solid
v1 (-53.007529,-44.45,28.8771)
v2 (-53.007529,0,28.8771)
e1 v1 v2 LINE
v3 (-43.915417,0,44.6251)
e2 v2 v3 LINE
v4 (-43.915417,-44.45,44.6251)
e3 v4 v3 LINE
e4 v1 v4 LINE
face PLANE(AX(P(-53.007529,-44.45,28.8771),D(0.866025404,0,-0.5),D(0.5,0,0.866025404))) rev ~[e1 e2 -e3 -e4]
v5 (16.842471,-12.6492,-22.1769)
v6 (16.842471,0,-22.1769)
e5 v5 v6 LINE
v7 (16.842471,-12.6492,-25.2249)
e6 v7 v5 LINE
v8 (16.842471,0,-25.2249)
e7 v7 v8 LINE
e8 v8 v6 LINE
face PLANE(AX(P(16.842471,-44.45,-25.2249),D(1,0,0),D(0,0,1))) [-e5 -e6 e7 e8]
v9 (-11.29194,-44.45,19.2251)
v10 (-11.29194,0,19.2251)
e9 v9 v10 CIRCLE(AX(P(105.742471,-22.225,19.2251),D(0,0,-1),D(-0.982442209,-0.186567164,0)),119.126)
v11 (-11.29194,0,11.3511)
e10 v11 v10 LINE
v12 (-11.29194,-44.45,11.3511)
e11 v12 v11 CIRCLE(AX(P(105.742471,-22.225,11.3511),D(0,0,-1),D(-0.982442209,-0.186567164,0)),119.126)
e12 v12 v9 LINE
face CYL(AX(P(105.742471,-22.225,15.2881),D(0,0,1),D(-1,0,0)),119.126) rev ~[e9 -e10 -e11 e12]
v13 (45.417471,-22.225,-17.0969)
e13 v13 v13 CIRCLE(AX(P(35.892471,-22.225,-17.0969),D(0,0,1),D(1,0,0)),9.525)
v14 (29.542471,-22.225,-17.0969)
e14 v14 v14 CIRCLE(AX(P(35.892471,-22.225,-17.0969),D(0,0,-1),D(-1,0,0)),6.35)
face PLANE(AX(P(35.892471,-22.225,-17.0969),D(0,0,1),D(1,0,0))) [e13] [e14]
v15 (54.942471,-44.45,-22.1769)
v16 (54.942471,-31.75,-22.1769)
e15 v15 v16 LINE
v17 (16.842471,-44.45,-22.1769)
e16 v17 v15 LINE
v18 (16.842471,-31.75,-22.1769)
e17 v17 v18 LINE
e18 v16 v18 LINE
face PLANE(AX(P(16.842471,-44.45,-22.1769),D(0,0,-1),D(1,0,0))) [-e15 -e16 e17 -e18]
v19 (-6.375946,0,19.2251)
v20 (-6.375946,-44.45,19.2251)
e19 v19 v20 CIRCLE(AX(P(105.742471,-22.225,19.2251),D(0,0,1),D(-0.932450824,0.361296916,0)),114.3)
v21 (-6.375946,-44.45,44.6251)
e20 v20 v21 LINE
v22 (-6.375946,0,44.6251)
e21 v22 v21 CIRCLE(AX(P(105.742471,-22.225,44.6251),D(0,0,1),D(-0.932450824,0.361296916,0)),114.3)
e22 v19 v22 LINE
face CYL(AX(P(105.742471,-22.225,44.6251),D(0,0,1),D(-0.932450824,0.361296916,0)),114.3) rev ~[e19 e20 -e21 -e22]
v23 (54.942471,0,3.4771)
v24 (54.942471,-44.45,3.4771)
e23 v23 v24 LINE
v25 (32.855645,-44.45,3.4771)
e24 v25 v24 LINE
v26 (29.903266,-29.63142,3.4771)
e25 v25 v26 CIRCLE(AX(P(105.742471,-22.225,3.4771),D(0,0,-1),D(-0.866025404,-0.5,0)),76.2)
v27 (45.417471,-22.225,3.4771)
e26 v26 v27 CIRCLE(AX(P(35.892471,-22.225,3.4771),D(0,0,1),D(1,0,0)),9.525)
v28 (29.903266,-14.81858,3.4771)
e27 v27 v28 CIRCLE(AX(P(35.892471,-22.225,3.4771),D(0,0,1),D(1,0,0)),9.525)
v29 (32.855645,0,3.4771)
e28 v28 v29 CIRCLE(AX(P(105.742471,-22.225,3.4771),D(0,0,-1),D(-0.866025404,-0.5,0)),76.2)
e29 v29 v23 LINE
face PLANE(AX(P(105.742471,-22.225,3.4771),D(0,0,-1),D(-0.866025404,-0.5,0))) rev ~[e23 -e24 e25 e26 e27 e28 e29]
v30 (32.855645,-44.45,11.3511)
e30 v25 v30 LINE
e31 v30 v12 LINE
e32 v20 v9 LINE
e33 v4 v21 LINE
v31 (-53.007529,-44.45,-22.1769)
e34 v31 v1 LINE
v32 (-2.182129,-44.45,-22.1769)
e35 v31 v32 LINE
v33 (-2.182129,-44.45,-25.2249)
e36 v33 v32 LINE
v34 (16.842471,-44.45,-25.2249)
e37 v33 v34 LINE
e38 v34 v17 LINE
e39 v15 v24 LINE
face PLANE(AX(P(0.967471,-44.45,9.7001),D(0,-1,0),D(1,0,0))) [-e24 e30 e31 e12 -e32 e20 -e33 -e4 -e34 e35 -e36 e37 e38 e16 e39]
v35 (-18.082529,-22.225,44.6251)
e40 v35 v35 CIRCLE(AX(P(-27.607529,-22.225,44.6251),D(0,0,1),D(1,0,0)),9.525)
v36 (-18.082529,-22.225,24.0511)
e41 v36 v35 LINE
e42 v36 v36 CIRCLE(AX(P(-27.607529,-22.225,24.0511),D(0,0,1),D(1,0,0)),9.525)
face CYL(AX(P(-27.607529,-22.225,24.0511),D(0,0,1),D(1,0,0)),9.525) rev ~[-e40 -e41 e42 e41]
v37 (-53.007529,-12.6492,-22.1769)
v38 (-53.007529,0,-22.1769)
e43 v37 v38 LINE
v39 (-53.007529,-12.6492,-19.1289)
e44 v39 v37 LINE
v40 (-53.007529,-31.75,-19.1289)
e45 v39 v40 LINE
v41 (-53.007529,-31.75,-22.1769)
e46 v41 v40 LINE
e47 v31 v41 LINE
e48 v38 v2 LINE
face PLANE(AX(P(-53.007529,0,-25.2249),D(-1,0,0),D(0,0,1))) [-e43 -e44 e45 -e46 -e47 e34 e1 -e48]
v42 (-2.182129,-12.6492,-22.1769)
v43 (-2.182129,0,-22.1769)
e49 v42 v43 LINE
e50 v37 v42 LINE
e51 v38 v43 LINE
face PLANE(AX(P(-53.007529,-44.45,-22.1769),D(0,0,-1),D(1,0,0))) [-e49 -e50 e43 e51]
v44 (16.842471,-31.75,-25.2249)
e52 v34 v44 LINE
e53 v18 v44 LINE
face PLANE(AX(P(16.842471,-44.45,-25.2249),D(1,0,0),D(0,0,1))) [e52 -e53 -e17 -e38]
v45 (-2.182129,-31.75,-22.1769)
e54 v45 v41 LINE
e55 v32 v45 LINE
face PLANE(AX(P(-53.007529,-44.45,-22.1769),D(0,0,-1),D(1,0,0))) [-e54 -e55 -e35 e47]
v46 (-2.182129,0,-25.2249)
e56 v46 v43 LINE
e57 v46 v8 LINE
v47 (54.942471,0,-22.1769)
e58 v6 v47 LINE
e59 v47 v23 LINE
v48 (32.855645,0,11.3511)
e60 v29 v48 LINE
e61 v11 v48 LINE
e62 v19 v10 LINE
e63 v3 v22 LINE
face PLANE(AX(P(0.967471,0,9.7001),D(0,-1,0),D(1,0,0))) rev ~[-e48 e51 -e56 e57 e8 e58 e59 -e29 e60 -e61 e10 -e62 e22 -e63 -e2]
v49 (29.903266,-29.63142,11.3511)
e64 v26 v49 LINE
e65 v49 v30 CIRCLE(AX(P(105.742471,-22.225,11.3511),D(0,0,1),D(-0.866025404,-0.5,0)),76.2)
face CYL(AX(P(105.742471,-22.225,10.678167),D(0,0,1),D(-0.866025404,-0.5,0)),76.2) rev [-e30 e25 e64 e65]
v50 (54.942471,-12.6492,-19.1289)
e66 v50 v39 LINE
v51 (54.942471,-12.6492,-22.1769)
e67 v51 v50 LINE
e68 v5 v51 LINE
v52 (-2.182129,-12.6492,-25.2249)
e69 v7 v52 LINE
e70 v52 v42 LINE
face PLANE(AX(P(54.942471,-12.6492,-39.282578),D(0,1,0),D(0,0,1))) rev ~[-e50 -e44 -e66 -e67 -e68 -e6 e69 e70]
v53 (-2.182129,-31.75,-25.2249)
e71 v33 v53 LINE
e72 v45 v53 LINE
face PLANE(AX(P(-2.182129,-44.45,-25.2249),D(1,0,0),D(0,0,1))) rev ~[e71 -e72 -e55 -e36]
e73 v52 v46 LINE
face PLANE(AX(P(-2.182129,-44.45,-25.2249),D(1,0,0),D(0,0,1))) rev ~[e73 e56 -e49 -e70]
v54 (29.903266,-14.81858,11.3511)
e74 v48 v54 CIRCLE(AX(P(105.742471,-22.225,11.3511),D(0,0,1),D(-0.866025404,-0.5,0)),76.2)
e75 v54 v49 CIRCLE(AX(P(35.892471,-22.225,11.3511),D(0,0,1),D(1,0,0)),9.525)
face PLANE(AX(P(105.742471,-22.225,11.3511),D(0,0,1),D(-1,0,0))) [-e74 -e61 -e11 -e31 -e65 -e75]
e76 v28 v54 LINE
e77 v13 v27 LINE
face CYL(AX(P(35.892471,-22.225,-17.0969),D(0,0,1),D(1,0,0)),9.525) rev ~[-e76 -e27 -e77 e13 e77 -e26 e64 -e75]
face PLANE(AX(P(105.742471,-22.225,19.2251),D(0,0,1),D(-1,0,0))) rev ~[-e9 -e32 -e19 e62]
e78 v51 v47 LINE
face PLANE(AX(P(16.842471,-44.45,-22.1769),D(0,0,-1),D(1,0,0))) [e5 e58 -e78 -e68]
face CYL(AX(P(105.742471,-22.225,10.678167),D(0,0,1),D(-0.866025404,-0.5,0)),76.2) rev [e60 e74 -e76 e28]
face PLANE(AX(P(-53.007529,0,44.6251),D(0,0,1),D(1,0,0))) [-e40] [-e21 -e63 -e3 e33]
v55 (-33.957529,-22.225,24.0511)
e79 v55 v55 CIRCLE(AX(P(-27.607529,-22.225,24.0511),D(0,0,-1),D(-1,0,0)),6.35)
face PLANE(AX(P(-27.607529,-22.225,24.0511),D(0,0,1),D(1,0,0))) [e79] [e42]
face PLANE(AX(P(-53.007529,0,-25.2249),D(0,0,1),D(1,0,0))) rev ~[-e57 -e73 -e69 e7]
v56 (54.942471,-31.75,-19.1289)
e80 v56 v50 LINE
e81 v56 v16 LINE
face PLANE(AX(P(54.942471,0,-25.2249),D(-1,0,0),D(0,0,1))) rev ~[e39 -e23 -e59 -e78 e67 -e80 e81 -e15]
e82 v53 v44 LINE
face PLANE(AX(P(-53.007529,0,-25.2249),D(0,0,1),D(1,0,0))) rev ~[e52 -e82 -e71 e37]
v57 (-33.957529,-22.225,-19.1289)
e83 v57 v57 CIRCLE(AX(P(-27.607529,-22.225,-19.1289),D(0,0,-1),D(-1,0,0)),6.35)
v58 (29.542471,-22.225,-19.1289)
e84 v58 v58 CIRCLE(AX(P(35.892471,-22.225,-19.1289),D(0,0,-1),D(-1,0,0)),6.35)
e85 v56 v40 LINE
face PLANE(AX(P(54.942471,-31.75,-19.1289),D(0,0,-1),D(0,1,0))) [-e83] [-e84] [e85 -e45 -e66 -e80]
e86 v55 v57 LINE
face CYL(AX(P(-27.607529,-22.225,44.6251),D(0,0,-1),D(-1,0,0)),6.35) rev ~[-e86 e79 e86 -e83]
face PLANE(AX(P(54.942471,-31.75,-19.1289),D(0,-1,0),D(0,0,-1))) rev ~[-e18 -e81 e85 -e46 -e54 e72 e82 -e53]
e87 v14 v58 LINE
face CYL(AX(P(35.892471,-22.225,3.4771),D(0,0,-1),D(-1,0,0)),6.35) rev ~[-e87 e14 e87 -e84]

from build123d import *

# Parameters (mm, degrees)
F0_W                   = 107.95
F0_H                   = 69.85
F1_DEPTH               = 44.45
F2_W                   = 50.8254
F2_H                   = 3.048
F2_W_2                 = 38.1
F3_DEPTH               = 66.64201
F3_DEPTH_BACK          = 161
F4_W                   = 19.1008
F4_H                   = 3.048
F4_H_2                 = 17.1056788669
F5_DEPTH               = 107.951
F7_DEPTH               = 33.274
F9_W                   = 18.9599941809
F9_H                   = 7.874
F11_W                  = 28.8704986477
F11_H                  = 14.4021337534
F12_ANGLE_BACK         = 30
F12_ANGLE              = 60
F15_D                  = 12.7
F15_CBORE_D            = 19.05
F15_CBORE_DEPTH        = 20.574
F15_ON_F14_D           = 12.7
F15_ON_F14_START       = 7.874
F15_ON_F14_CBORE_D     = 19.05
F15_ON_F14_CBORE_DEPTH = 20.574


# Not quite as in the source:
# - an extrude ends at something that could not be found from the text; its depth is read off the source's solid
# - a length typed as a fraction of an inch, garbled in the dataset ("3 / 203.2 mm" for 3/8 in), is restored


with BuildPart() as f1:
    # F0 (on Front) → F1 (new body)
    with BuildSketch(Plane.XZ):
        with Locations((0.967470929, 9.7001004595)):
            Rectangle(F0_W, F0_H)
    extrude(amount=F1_DEPTH)

    # F2 (on face) → F3 (cut, two sides)
    with BuildSketch(Plane.XZ.offset(44.45)) as f3_sk:
        with Locations((-27.594829071, -23.7008995405)):
            Rectangle(F2_W, F2_H)
        with Locations((35.892470929, -23.7008995405)):
            Rectangle(F2_W_2, F2_H)
        Polygon((-53.007529071, 44.6251004595), (-43.9154170318, 44.6251004595), (-53.007529071, 49.8744337929), (-64.4665259088, 30.026869066), (-53.007529071, 28.8771004595), align=None)
        Polygon((-53.007529071, 28.8771004595), (-43.9154170318, 44.6251004595), (-53.007529071, 44.6251004595), align=None)
    extrude(amount=-F3_DEPTH, mode=Mode.SUBTRACT)
    extrude(f3_sk.sketch, amount=F3_DEPTH_BACK, mode=Mode.SUBTRACT)

    # F4 (on face) → F5 (cut, through all)
    with BuildSketch(Plane.YZ.offset(54.942470929)):
        with Locations((-22.1996, -20.6528995405)):
            Rectangle(F4_W, F4_H)
        with Locations((-22.1996, -30.7297389739)):
            Rectangle(F4_W, F4_H_2)
    extrude(amount=-F5_DEPTH, mode=Mode.SUBTRACT)

    # F6 (on face) → F7 (cut)
    with BuildSketch(Plane.XY.offset(44.6251004595)):
        with BuildLine():
            Line((84.230268681, 4.7385622747), (-0.8366582079, 19.0712375092))
            ThreePointArc((-0.8366582079, 19.0712375092), (-8.5367916359, -24.4021880093), (0.8136185269, -67.5507755982))
            Line((0.8136185269, -67.5507755982), (81.3293292463, -56.9063611329))
            Line((81.3293292463, -56.9063611329), (105.742470929, -22.225))
            Line((105.742470929, -22.225), (84.230268681, 4.7385622747))
        make_face()
    extrude(amount=-F7_DEPTH, mode=Mode.SUBTRACT)

    # F9 (on offset) → F10 (revolve, cut)
    with BuildSketch(Plane.XZ.offset(22.225)):
        with Locations((-3.9035319805, 15.2881004595)):
            Rectangle(F9_W, F9_H)
    revolve(axis=Axis((105.742470929, -22.225, 44.6251004595), (0, 0, 1)), mode=Mode.SUBTRACT)

    # F11 (on offset) → F12 (revolve, cut)
    with BuildSketch(Plane.XZ.offset(22.225), mode=Mode.PRIVATE) as f12_sk:
        with Locations((43.9777202529, 10.6781673362)):
            Rectangle(F11_W, F11_H)
    revolve(f12_sk.sketch.rotate(Axis((105.742470929, -22.225, 44.6251004595), (0, 0, -1)), -F12_ANGLE_BACK), axis=Axis((105.742470929, -22.225, 44.6251004595), (0, 0, -1)), revolution_arc=F12_ANGLE, mode=Mode.SUBTRACT)

    # F15 (through all)
    with Locations(Plane.XY.offset(44.6251004595)):
        with Locations((-27.607529071, -22.225)):
            CounterBoreHole(F15_D / 2, F15_CBORE_D / 2, F15_CBORE_DEPTH)

    # F15 on F14 (through all)
    # its depths count from where the whole tool has entered the part; down to there all is cleared
    with Locations(Plane.XY.offset(11.3511004595).offset(-F15_ON_F14_START)):
        with Locations((35.892470929, -22.225)):
            CounterBoreHole(F15_ON_F14_D / 2, F15_ON_F14_CBORE_D / 2, F15_ON_F14_CBORE_DEPTH)


solid = f1.part
